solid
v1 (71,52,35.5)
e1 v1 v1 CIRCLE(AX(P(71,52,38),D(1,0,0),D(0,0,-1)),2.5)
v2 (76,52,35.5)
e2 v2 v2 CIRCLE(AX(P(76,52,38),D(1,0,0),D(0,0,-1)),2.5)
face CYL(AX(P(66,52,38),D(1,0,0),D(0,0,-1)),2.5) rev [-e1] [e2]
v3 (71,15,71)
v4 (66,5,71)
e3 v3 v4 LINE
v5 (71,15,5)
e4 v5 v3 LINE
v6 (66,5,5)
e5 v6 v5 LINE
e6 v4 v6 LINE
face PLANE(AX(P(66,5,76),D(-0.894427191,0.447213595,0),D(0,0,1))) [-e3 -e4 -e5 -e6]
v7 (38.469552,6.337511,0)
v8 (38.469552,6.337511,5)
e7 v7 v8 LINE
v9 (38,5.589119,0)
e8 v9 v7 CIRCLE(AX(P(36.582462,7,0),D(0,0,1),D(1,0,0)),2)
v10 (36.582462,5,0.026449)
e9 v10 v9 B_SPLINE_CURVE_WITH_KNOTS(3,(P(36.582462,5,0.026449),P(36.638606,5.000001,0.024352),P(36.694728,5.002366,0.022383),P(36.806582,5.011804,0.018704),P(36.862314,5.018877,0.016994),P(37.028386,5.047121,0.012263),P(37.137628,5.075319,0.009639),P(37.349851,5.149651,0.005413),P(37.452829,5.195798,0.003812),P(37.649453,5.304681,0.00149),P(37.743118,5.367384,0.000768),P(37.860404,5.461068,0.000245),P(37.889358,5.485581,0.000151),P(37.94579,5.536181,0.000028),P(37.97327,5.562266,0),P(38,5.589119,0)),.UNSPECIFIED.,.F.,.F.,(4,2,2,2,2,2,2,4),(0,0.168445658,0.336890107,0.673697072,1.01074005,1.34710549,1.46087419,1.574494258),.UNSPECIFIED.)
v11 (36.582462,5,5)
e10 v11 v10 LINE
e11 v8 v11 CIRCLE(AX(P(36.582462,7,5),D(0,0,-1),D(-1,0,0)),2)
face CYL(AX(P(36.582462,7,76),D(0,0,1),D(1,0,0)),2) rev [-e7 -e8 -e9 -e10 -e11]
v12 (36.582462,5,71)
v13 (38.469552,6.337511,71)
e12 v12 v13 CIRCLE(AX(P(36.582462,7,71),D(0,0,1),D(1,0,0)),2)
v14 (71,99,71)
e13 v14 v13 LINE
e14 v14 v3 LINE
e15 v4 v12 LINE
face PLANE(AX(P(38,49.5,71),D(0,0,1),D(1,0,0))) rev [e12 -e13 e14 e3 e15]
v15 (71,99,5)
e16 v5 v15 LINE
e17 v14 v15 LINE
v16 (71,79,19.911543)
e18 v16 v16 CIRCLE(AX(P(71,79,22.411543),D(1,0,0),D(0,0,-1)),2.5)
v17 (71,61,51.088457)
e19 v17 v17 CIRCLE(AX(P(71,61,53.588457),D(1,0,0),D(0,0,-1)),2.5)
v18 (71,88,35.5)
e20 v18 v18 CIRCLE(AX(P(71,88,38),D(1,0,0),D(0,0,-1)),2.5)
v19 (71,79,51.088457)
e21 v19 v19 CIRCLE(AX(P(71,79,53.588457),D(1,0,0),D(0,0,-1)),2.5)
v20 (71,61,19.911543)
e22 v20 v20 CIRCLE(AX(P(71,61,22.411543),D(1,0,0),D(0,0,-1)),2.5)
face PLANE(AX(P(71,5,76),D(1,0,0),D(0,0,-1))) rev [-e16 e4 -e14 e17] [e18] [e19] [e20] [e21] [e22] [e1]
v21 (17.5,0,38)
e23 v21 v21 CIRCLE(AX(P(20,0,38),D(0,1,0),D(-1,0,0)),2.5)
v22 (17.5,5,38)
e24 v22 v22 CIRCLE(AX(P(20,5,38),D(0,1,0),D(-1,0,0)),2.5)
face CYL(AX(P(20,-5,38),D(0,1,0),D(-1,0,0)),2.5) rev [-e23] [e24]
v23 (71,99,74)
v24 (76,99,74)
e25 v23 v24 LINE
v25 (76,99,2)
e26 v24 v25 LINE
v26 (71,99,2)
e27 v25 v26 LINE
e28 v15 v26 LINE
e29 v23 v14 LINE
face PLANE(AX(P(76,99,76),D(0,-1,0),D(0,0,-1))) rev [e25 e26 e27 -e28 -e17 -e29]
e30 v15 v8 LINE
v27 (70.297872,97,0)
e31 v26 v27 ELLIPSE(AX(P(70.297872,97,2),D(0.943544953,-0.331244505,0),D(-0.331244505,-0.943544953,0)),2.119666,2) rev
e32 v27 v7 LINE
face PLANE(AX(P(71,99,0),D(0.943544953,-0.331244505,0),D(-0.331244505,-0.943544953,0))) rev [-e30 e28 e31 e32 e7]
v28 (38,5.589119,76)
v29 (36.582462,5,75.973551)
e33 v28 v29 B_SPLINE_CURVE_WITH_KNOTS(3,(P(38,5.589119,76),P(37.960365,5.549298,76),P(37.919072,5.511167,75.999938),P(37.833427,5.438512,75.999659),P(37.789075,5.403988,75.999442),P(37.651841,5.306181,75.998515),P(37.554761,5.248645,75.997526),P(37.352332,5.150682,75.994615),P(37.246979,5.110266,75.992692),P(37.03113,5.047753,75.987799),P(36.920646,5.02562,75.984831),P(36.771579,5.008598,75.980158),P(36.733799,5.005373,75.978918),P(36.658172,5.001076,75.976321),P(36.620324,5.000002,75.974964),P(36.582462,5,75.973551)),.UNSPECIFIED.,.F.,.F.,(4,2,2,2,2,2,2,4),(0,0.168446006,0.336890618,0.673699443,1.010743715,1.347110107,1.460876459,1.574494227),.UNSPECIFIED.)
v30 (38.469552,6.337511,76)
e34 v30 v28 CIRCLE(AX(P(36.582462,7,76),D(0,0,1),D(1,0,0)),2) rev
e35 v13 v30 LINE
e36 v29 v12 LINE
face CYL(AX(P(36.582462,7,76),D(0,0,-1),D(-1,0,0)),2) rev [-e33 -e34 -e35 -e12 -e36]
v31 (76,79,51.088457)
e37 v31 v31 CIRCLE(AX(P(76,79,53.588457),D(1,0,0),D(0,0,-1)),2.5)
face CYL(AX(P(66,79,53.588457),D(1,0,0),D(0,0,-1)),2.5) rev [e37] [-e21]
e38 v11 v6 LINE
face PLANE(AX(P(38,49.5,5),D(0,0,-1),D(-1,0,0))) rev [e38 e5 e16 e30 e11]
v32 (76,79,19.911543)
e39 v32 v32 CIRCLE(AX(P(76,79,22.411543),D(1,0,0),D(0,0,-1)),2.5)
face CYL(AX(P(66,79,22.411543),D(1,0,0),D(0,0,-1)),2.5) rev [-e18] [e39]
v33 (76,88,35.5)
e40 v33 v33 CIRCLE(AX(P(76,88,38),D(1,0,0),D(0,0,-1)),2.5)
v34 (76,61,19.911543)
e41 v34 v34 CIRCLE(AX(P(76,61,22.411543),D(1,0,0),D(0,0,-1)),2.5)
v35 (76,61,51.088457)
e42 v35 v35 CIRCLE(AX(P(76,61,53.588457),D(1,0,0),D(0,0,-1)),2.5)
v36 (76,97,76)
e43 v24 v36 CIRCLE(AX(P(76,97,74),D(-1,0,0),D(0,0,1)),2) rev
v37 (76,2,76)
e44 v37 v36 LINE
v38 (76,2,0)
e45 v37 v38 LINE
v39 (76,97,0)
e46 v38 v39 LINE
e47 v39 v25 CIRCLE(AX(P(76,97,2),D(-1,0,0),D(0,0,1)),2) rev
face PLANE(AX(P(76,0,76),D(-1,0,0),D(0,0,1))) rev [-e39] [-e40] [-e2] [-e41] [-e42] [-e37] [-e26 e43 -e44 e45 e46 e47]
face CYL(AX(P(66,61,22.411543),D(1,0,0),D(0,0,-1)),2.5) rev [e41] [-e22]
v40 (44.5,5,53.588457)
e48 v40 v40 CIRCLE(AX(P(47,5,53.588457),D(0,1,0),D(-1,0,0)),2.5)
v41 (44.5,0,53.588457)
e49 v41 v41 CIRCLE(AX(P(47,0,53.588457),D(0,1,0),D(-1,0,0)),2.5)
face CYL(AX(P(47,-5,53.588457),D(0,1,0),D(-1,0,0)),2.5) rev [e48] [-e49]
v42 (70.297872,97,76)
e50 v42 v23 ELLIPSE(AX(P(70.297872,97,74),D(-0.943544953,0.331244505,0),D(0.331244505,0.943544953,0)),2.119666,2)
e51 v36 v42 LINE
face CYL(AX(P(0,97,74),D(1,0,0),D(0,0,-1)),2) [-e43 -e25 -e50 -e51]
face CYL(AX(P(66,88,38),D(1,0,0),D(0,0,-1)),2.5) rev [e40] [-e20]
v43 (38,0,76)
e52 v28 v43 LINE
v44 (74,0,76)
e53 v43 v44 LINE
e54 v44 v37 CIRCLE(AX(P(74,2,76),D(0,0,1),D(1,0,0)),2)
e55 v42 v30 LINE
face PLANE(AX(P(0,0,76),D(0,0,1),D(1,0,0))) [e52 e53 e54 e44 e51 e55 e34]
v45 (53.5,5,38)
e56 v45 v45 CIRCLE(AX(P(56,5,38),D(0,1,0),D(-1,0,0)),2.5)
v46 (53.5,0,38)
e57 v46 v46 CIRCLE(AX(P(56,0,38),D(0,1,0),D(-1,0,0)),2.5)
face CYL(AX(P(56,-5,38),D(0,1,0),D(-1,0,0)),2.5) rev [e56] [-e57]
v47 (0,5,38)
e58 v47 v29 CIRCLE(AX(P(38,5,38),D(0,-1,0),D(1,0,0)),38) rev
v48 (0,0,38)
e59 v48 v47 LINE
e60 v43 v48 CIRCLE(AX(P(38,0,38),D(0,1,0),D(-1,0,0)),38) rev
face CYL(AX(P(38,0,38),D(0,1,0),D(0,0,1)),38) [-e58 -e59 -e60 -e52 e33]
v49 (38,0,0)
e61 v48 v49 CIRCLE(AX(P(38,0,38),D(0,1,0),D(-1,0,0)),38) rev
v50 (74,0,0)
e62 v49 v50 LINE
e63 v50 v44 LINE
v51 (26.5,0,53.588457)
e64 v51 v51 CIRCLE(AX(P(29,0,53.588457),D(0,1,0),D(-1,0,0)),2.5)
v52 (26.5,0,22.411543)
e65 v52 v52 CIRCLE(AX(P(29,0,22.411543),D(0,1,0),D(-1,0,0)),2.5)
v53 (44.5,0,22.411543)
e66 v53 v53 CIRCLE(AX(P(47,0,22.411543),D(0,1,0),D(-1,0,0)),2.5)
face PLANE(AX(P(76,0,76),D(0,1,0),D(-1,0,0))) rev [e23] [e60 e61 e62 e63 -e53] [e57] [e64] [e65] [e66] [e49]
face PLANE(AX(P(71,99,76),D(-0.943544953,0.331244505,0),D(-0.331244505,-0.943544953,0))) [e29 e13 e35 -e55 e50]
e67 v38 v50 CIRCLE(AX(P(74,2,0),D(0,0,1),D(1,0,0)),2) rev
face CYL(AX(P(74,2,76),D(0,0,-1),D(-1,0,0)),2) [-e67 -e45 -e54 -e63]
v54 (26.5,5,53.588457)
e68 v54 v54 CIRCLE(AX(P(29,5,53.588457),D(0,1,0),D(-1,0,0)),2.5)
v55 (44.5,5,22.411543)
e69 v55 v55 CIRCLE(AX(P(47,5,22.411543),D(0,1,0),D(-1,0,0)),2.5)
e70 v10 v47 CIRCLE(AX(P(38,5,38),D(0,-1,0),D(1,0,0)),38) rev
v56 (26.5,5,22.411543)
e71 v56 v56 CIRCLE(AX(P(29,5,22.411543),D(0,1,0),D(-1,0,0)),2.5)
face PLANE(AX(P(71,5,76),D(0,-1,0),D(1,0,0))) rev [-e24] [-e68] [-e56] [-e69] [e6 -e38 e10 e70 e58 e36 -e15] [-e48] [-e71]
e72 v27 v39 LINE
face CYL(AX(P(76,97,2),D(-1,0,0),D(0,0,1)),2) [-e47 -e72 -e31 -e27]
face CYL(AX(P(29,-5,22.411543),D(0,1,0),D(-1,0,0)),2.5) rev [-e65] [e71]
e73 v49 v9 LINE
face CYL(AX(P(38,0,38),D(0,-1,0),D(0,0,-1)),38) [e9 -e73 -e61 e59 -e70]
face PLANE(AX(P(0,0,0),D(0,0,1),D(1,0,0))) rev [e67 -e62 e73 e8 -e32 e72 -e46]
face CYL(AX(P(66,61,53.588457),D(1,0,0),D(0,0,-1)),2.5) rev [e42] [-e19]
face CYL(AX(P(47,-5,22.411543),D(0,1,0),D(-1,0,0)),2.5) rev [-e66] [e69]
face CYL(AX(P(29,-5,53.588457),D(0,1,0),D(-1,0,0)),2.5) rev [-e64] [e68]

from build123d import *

# Parameters (mm, degrees)
EXTRUDE_1_DEPTH     = 76
FILLET_1_R          = 38
RIB_1_REACH         = 148.127
SKETCH_4_WALL_W     = 393.877609006
SKETCH_4_WALL_H     = 5
RIB_START           = -5
RIB_2_DEPTH         = 5
SKETCH_7_R          = 2.5
CUT_EXTRUDE_1_DEPTH = 10
SKETCH_8_R          = 2.5
CUT_EXTRUDE_2_DEPTH = 10
FILLET_2_R          = 2
CHAMFER_1_SIZE      = 10
CHAMFER_1_SIZE2     = 5
FILLET_3_R          = 2
FILLET_4_R          = 2


# Read off the part's stored shape, not the designer's step: Ребро2
with BuildPart() as part:
    # Эскиз3 → Бобышка-Вытянуть1 (new body)
    with BuildSketch(Plane.XY):
        Polygon((76, 0), (0, 0), (0, 5), (71, 5), (71, 99), (76, 99), align=None)
    extrude(amount=EXTRUDE_1_DEPTH)

    # Скругление1
    fillet_1_edges = [part.edges().sort_by_distance(p)[0] for p in [
        (0, 2.5, 0),
        (0, 2.5, 76),
    ]]
    fillet(fillet_1_edges, radius=FILLET_1_R - 0.0001)  # a hair under: the kernel refuses the full size

    # Эскиз4 wall → Ребро1 (add, up to next)
    with BuildSketch(Plane(origin=(54.5, 52, 76), x_dir=(-0.331244504731, -0.94354495287, 0), z_dir=(0.94354495287, -0.331244504731, 0)), mode=Mode.PRIVATE) as rib_1_sk1:
        with Locations((0, 2.5)):
            Rectangle(SKETCH_4_WALL_W, SKETCH_4_WALL_H)
    rib_1_tool1 = extrude(rib_1_sk1.sketch, amount=RIB_1_REACH, mode=Mode.PRIVATE) - part.part
    add(rib_1_tool1.solids().sort_by_distance((54.5, 52, 76))[0])

    # Ребро2 outline → Ребро2 (add)
    with BuildSketch(Plane(origin=(0, 0, 0), x_dir=(-1, 0, 0), z_dir=(0, 0, -1)).offset(RIB_START)):
        Polygon((-38, 5), (-71, 99), (-71, 5), align=None)
    extrude(amount=RIB_2_DEPTH)

    # Эскиз7 → Вырез-Вытянуть1 (cut)
    with BuildSketch(Plane(origin=(0, 5, 0), x_dir=(1, 0, 0), z_dir=(0, 1, 0))):
        with Locations(Location((20, -38, 0), (0, 0, 180))):
            Circle(SKETCH_7_R)
        with Locations(Location((29, -22.411542732, 0), (0, 0, 180))):
            Circle(SKETCH_7_R)
        with Locations(Location((47, -22.411542732, 0), (0, 0, 180))):
            Circle(SKETCH_7_R)
        with Locations(Location((56, -38, 0), (0, 0, 180))):
            Circle(SKETCH_7_R)
        with Locations(Location((47, -53.588457268, 0), (0, 0, 180))):
            Circle(SKETCH_7_R)
        with Locations(Location((29, -53.588457268, 0), (0, 0, 180))):
            Circle(SKETCH_7_R)
    extrude(amount=-CUT_EXTRUDE_1_DEPTH, mode=Mode.SUBTRACT)

    # Эскиз8 → Вырез-Вытянуть2 (cut)
    with BuildSketch(Plane(origin=(76, 0, 0), x_dir=(0, 0, -1), z_dir=(1, 0, 0))):
        with Locations((-38, 52)):
            Circle(SKETCH_8_R)
        with Locations((-53.588457268, 61)):
            Circle(SKETCH_8_R)
        with Locations((-53.588457268, 79)):
            Circle(SKETCH_8_R)
        with Locations((-38, 88)):
            Circle(SKETCH_8_R)
        with Locations((-22.411542732, 79)):
            Circle(SKETCH_8_R)
        with Locations((-22.411542732, 61)):
            Circle(SKETCH_8_R)
    extrude(amount=-CUT_EXTRUDE_2_DEPTH, mode=Mode.SUBTRACT)

    # Скругление2
    fillet_2_edges = [part.edges().sort_by_distance(p)[0] for p in [
        (76, 0, 38),
    ]]
    fillet(fillet_2_edges, radius=FILLET_2_R)

    # Фаска1
    chamfer_1_edges = [part.edges().sort_by_distance(p)[0] for p in [
        (71, 5, 38),
    ]]
    chamfer_1_side = [part.faces().sort_by_distance(p)[0] for p in [
        (71, 52, 6.148564321),
    ]]
    chamfer(chamfer_1_edges, length=CHAMFER_1_SIZE, length2=CHAMFER_1_SIZE2, reference=chamfer_1_side[0])

    # Скругление3
    fillet_3_edges = [part.edges().sort_by_distance(p)[0] for p in [
        (38, 5, 73.5),
        (38, 5, 2.5),
    ]]
    fillet(fillet_3_edges, radius=FILLET_3_R)

    # Скругление4
    fillet_4_edges = [part.edges().sort_by_distance(p)[0] for p in [
        (73.5, 99, 76),
        (73.5, 99, 0),
    ]]
    fillet(fillet_4_edges, radius=FILLET_4_R)


solid = part.part
